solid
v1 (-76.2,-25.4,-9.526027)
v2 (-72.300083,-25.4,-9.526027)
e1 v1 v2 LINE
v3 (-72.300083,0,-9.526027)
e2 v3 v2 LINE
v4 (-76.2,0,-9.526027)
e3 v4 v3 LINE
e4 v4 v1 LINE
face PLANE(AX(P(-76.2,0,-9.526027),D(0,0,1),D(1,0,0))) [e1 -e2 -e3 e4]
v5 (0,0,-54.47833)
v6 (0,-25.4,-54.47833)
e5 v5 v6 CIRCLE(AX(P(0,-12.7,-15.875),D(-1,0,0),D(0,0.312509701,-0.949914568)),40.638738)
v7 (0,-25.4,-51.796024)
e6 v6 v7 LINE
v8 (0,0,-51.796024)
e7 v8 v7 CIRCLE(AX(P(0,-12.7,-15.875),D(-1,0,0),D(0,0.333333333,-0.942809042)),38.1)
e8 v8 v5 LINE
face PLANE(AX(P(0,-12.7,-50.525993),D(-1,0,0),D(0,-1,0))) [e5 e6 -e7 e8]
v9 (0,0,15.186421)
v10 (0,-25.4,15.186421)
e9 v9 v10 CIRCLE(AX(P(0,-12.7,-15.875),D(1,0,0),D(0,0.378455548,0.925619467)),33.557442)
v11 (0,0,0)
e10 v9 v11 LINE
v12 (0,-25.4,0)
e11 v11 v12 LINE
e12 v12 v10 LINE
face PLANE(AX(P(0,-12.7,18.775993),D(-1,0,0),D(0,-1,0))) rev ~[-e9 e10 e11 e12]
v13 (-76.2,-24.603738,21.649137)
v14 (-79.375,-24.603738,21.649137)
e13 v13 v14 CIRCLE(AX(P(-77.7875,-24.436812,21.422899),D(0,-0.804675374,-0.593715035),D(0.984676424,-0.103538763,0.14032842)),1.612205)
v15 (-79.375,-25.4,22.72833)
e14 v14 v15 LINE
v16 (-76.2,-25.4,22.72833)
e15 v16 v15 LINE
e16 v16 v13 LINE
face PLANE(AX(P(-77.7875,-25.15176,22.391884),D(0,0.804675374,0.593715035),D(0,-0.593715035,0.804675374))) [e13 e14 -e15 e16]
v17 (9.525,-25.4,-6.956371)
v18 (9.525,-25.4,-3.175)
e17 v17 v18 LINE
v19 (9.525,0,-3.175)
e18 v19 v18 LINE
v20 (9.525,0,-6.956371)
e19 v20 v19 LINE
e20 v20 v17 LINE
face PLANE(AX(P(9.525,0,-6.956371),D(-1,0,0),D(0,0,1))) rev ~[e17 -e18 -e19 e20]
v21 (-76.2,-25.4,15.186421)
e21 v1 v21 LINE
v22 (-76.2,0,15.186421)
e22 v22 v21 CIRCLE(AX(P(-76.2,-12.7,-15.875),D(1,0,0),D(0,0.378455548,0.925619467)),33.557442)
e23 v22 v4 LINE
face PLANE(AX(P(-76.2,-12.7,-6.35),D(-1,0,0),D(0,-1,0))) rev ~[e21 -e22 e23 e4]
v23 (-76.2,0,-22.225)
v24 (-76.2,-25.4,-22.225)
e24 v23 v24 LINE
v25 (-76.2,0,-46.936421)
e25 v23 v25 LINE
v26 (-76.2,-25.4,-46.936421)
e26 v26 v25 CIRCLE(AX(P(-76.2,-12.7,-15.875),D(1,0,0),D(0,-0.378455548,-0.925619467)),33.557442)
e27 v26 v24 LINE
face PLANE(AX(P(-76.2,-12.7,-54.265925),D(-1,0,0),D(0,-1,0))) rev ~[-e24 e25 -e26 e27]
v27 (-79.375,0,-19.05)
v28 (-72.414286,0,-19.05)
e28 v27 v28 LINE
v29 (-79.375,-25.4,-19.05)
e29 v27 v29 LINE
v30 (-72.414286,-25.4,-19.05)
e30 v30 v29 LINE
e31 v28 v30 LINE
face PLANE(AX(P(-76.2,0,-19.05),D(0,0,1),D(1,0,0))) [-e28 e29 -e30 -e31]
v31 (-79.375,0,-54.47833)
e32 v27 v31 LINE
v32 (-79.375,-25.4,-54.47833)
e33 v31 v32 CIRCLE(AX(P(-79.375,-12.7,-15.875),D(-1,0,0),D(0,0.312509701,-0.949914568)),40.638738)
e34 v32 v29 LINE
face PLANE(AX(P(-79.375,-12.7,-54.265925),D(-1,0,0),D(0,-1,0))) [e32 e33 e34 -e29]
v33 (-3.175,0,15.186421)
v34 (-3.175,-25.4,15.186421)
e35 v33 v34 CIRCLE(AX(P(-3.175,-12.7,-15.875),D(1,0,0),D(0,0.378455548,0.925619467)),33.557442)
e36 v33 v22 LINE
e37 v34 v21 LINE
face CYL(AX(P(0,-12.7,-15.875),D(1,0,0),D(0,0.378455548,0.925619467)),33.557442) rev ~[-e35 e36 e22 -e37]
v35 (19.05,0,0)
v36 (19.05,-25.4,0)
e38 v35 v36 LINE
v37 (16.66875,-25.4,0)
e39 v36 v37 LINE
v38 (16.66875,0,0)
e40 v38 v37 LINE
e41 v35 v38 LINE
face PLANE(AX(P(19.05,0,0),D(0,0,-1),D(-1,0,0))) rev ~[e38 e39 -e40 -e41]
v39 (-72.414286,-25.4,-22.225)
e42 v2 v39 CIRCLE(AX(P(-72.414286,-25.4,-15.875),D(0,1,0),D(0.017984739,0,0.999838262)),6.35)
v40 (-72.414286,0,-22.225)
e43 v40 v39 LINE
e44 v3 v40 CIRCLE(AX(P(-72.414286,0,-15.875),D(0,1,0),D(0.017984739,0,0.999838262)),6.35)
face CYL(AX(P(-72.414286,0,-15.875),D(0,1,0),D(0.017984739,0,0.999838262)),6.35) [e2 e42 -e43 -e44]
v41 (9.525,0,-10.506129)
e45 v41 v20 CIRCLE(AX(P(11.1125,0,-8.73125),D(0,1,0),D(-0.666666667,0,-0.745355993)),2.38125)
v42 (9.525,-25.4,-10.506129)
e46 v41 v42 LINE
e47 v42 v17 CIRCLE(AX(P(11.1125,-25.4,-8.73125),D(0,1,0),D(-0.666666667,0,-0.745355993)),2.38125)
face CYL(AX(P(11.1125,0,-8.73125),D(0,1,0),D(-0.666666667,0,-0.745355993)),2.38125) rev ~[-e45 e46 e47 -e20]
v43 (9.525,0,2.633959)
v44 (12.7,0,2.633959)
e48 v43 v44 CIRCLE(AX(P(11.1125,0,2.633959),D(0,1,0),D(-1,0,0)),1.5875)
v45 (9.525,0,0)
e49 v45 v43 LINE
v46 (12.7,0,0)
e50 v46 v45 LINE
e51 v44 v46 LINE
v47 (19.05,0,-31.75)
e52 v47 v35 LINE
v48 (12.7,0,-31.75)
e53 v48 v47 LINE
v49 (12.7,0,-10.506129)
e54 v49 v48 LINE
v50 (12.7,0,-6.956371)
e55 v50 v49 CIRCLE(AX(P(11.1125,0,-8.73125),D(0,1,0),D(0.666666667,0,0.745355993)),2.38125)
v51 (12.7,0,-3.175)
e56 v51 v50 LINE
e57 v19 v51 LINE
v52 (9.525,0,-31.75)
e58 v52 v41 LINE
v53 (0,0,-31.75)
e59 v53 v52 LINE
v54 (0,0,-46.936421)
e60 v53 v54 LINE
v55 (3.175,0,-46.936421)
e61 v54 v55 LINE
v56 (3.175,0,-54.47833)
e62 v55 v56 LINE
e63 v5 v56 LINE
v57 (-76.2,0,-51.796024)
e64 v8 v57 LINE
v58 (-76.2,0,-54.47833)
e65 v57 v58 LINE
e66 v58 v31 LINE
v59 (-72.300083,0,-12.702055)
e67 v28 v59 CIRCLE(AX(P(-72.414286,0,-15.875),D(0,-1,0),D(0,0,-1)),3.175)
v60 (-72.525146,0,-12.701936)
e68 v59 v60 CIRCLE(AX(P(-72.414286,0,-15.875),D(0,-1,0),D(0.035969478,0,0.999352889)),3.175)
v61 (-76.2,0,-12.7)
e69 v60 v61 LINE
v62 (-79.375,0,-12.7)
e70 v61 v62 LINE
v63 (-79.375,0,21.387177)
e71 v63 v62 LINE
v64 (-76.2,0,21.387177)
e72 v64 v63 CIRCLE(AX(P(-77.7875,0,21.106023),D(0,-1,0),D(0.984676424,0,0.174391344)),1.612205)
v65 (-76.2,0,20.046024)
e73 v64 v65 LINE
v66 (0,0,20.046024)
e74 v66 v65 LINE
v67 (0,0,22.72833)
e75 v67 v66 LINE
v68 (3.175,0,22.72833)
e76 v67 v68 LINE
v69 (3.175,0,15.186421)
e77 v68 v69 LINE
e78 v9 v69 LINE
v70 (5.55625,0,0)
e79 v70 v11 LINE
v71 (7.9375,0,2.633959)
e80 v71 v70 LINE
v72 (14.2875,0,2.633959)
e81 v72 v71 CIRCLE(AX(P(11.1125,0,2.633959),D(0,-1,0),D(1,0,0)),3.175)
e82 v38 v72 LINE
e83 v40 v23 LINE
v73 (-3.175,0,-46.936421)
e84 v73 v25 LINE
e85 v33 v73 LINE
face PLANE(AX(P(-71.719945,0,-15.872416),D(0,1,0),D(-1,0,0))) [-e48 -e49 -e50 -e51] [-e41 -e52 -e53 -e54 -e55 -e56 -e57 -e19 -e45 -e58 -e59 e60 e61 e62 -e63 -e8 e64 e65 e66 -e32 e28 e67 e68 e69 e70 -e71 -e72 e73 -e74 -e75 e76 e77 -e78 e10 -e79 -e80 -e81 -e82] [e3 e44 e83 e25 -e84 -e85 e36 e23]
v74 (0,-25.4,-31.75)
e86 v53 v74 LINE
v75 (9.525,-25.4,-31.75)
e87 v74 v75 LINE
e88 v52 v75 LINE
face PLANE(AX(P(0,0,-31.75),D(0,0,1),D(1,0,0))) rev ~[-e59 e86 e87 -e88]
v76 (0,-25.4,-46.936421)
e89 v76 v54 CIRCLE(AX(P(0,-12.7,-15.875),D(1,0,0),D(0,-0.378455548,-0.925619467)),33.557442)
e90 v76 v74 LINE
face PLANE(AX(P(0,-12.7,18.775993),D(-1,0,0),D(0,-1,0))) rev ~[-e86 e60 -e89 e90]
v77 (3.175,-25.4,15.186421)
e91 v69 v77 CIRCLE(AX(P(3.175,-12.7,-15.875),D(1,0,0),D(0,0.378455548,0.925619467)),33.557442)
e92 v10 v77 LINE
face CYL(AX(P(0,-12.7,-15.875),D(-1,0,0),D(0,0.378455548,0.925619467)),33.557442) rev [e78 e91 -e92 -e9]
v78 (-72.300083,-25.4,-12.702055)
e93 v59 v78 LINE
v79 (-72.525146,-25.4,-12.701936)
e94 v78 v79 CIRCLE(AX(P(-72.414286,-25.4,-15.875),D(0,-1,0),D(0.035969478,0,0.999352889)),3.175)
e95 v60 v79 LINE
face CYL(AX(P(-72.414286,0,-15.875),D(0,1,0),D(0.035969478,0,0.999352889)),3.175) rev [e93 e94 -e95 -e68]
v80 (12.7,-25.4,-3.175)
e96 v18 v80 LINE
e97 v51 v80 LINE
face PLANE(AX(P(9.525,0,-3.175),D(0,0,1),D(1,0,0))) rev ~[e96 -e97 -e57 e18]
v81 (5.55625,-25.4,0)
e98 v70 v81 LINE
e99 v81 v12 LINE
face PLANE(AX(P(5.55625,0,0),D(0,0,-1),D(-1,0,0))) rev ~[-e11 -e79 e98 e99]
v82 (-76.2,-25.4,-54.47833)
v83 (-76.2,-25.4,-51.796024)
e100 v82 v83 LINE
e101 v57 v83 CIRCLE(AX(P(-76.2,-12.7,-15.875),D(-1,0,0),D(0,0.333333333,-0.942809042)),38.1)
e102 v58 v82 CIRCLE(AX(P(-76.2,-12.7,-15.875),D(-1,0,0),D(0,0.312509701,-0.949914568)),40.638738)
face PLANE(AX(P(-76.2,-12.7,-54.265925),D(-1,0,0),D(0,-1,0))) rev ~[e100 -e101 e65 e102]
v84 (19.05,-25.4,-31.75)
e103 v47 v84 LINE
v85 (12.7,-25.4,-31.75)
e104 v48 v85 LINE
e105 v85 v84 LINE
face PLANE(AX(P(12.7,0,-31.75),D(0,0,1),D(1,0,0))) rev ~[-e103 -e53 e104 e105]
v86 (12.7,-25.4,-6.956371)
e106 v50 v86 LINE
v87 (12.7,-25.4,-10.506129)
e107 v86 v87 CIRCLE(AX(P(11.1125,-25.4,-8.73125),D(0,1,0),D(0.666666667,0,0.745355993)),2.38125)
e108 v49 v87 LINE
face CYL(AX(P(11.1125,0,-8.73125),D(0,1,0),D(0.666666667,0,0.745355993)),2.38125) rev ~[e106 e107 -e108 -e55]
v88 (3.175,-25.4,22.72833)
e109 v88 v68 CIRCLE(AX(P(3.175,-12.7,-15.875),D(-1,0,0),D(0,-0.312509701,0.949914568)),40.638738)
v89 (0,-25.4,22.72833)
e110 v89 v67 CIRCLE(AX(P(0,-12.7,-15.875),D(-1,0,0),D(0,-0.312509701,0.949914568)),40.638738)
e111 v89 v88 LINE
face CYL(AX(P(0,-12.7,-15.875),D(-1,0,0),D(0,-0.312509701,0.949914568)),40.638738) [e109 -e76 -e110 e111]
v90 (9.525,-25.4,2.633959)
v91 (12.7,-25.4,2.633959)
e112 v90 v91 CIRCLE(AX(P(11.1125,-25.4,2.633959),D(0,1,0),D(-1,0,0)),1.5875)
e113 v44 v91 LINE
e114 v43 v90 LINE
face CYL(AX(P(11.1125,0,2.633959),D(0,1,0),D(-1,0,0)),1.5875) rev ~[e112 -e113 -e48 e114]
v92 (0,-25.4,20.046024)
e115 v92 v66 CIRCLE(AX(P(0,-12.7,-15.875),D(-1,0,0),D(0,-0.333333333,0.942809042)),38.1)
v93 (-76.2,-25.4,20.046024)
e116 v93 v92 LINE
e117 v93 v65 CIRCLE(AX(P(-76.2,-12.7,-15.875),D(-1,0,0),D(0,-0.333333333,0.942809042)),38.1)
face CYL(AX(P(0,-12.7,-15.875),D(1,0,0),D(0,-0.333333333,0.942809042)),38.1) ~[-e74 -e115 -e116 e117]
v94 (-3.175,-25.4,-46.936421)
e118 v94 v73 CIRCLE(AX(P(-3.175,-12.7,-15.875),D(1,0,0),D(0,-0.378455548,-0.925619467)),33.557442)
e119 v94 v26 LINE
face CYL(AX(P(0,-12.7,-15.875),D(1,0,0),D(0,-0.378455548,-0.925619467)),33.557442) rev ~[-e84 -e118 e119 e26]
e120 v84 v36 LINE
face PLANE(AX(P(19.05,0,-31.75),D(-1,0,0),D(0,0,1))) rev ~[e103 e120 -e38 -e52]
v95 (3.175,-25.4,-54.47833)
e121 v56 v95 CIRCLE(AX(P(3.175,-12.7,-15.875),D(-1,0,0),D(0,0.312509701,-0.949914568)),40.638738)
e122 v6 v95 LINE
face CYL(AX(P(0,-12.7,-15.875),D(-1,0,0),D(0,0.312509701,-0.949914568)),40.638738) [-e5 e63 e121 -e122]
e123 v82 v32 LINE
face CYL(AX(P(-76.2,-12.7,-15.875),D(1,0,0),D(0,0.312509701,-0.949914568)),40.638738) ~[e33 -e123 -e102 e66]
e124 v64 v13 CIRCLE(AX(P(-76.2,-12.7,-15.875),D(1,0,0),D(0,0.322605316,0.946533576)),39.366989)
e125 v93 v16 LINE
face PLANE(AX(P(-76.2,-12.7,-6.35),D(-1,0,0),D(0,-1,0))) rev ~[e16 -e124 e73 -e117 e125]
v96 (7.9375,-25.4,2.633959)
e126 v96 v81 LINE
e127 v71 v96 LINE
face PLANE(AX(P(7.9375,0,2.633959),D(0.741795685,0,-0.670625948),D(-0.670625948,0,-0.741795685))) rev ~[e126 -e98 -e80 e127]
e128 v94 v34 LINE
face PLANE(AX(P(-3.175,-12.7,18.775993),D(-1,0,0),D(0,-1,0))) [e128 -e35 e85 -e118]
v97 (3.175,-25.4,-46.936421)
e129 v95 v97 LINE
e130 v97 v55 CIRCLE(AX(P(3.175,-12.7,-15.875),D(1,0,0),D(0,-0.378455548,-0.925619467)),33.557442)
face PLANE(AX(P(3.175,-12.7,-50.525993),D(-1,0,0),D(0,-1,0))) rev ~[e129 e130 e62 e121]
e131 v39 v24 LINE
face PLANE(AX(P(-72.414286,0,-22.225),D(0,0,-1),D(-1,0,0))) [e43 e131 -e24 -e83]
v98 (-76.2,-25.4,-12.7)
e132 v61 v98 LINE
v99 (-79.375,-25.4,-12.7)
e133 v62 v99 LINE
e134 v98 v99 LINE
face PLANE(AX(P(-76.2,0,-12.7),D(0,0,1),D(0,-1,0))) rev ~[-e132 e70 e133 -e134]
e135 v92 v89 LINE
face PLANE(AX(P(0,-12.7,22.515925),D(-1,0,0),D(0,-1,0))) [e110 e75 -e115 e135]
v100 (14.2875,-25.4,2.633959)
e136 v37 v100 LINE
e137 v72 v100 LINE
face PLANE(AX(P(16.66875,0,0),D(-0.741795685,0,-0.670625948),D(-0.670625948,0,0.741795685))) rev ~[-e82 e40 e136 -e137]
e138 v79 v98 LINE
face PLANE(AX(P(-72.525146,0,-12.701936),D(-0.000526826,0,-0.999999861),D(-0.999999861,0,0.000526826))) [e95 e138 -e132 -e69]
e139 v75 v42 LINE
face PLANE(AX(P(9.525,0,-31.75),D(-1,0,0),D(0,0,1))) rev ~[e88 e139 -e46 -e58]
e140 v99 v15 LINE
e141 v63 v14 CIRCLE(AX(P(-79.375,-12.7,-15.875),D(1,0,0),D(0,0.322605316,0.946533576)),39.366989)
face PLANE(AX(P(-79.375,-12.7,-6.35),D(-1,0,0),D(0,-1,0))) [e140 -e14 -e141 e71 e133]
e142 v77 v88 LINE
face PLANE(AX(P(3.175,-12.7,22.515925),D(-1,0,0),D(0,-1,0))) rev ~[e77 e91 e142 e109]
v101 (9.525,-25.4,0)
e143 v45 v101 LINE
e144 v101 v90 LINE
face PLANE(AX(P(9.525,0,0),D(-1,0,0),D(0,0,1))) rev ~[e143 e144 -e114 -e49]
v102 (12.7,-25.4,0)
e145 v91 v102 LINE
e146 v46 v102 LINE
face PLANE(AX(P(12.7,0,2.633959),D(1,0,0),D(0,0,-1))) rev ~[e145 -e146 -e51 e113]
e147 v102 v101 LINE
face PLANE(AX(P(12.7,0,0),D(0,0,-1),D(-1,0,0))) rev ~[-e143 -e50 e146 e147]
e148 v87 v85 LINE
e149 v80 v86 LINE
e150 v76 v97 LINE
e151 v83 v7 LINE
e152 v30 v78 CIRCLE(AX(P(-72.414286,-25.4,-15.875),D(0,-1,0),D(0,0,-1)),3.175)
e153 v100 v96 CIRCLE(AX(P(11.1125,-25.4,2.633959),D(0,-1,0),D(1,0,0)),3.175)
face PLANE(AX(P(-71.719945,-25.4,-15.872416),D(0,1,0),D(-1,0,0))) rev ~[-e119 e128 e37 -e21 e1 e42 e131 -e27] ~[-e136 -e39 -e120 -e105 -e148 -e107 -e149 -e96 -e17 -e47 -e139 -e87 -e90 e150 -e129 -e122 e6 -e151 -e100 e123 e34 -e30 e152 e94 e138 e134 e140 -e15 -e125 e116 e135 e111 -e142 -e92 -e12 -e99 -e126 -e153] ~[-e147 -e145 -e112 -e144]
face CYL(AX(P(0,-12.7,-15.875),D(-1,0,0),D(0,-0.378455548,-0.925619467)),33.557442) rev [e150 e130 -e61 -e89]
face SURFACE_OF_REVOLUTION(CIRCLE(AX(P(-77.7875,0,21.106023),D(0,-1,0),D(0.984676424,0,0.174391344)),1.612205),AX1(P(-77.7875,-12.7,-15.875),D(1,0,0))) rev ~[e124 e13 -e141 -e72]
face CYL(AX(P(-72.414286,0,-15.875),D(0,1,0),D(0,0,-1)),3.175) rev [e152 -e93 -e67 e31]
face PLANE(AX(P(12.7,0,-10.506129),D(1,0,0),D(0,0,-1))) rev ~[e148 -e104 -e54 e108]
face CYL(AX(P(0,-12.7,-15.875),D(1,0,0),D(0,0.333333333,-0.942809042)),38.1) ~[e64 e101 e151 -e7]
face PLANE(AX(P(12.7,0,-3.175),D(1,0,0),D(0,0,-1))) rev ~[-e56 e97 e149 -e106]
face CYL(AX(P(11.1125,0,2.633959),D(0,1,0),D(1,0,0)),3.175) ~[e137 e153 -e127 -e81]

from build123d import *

# Parameters (mm, degrees)
F1_DEPTH = 25.4
F2_W     = 25.4
F2_H     = 12.7
F3_DEPTH = 3.175
F4_DEPTH = 76.2
F5_START = 76.2
F5_DEPTH = 3.175
F6_DEPTH = 3.175
F8_DEPTH = 25.4


# Not quite as in the source:
# - a feature names something its author has since deleted; it is built from what else it names


with BuildPart() as f1:
    # F0 (on Front) → F1 (new body)
    with BuildSketch(Plane.XZ):
        with BuildLine():
            Line((5.55625, 0), (0, 0))
            Line((0, 0), (0, -31.75))
            Line((0, -31.75), (9.525, -31.75))
            Line((9.525, -31.75), (9.525, -10.5061289571))
            ThreePointArc((9.525, -10.5061289571), (8.73125, -8.73125), (9.525, -6.9563710429))
            Line((9.525, -6.9563710429), (9.525, -3.175))
            Line((9.525, -3.175), (11.1125, -3.175))
            Line((11.1125, -3.175), (12.7, -3.175))
            Line((12.7, -3.175), (12.7, -6.35))
            Line((12.7, -6.35), (12.7, -6.9563710429))
            ThreePointArc((12.7, -6.9563710429), (13.49375, -8.73125), (12.7, -10.5061289571))
            Line((12.7, -10.5061289571), (12.7, -28.575))
            Line((12.7, -28.575), (12.7, -31.75))
            Line((12.7, -31.75), (19.05, -31.75))
            Line((19.05, -31.75), (19.05, 0))
            Line((19.05, 0), (16.66875, 0))
            Line((16.66875, 0), (14.2875, 2.6339585893))
            ThreePointArc((14.2875, 2.6339585893), (11.1125, 5.8089585893), (7.9375, 2.6339585893))
            Line((7.9375, 2.6339585893), (5.55625, 0))
        make_face()
        with BuildLine():
            Line((12.7, 0), (11.1125, 0))
            Line((11.1125, 0), (9.525, 0))
            Line((9.525, 0), (9.525, 2.6339585893))
            ThreePointArc((9.525, 2.6339585893), (11.1125, 4.2214585893), (12.7, 2.6339585893))
            Line((12.7, 2.6339585893), (12.7, 0))
        make_face(mode=Mode.SUBTRACT)
    extrude(amount=F1_DEPTH)

    # F2 (on face) → F3 (join)
    with BuildSketch(Plane(origin=(0, 0, 0), x_dir=(0, -1, 0), z_dir=(-1, 0, 0))):
        with BuildLine():
            ThreePointArc((0, 15.186421298), (12.7, 17.6824416941), (25.4, 15.186421298))
            Line((25.4, 15.186421298), (25.4, 20.0460244843))
            ThreePointArc((25.4, 20.0460244843), (12.7, 22.225), (0, 20.0460244843))
            Line((0, 20.0460244843), (0, 15.186421298))
        make_face()
        with BuildLine():
            Line((0, 0), (25.4, 0))
            Line((25.4, 0), (25.4, 15.186421298))
            ThreePointArc((25.4, 15.186421298), (12.7, 17.6824416941), (0, 15.186421298))
            Line((0, 15.186421298), (0, 0))
        make_face()
        with BuildLine():
            Line((0, -31.75), (0, -46.936421298))
            ThreePointArc((0, -46.936421298), (12.7, -49.4324416941), (25.4, -46.936421298))
            Line((25.4, -46.936421298), (25.4, -31.75))
            Line((25.4, -31.75), (0, -31.75))
        make_face()
        with BuildLine():
            Line((0, -46.936421298), (0, -51.7960244843))
            ThreePointArc((0, -51.7960244843), (12.7, -53.975), (25.4, -51.7960244843))
            Line((25.4, -51.7960244843), (25.4, -46.936421298))
            ThreePointArc((25.4, -46.936421298), (12.7, -49.4324416941), (0, -46.936421298))
        make_face()
        with Locations((12.7, -25.4)):
            Rectangle(F2_W, F2_H)
        with Locations((12.7, -6.35)):
            Rectangle(F2_W, F2_H)
        Polygon((0, -15.875), (0, -19.05), (25.4, -19.05), (25.4, -12.7), (0, -12.7), align=None)
    extrude(amount=F3_DEPTH)

    # F2 (on face) → F4 (join)
    with BuildSketch(Plane(origin=(0, 0, 0), x_dir=(0, -1, 0), z_dir=(-1, 0, 0))):
        with BuildLine():
            ThreePointArc((0, 15.186421298), (12.7, 17.6824416941), (25.4, 15.186421298))
            Line((25.4, 15.186421298), (25.4, 20.0460244843))
            ThreePointArc((25.4, 20.0460244843), (12.7, 22.225), (0, 20.0460244843))
            Line((0, 20.0460244843), (0, 15.186421298))
        make_face()
        with BuildLine():
            Line((0, -46.936421298), (0, -51.7960244843))
            ThreePointArc((0, -51.7960244843), (12.7, -53.975), (25.4, -51.7960244843))
            Line((25.4, -51.7960244843), (25.4, -46.936421298))
            ThreePointArc((25.4, -46.936421298), (12.7, -49.4324416941), (0, -46.936421298))
        make_face()
    extrude(amount=F4_DEPTH)

    # F2 (on face) → F5 (join)
    with BuildSketch(Plane(origin=(0, 0, 0), x_dir=(0, -1, 0), z_dir=(-1, 0, 0)).offset(F5_START)):
        with BuildLine():
            ThreePointArc((25.4, -51.7960244843), (12.7, -53.975), (0, -51.7960244843))
            Line((0, -51.7960244843), (0, -54.4783297054))
            ThreePointArc((0, -54.4783297054), (12.7, -56.5137384689), (25.4, -54.4783297054))
            Line((25.4, -54.4783297054), (25.4, -51.7960244843))
        make_face()
        with BuildLine():
            Line((0, -46.936421298), (0, -51.7960244843))
            ThreePointArc((0, -51.7960244843), (12.7, -53.975), (25.4, -51.7960244843))
            Line((25.4, -51.7960244843), (25.4, -46.936421298))
            ThreePointArc((25.4, -46.936421298), (12.7, -49.4324416941), (0, -46.936421298))
        make_face()
        with BuildLine():
            Line((0, -31.75), (0, -46.936421298))
            ThreePointArc((0, -46.936421298), (12.7, -49.4324416941), (25.4, -46.936421298))
            Line((25.4, -46.936421298), (25.4, -31.75))
            Line((25.4, -31.75), (0, -31.75))
        make_face()
        with Locations((12.7, -25.4)):
            Rectangle(F2_W, F2_H)
        with Locations((12.7, -6.35)):
            Rectangle(F2_W, F2_H)
        with BuildLine():
            Line((0, 0), (25.4, 0))
            Line((25.4, 0), (25.4, 15.186421298))
            ThreePointArc((25.4, 15.186421298), (12.7, 17.6824416941), (0, 15.186421298))
            Line((0, 15.186421298), (0, 0))
        make_face()
        with BuildLine():
            ThreePointArc((0, 15.186421298), (12.7, 17.6824416941), (25.4, 15.186421298))
            Line((25.4, 15.186421298), (25.4, 20.0460244843))
            ThreePointArc((25.4, 20.0460244843), (12.7, 22.225), (0, 20.0460244843))
            Line((0, 20.0460244843), (0, 15.186421298))
        make_face()
        with BuildLine():
            ThreePointArc((0, 20.0460244843), (12.7, 22.225), (25.4, 20.0460244843))
            Line((25.4, 20.0460244843), (25.4, 22.7283297054))
            ThreePointArc((25.4, 22.7283297054), (12.7, 24.7637384689), (0, 22.7283297054))
            Line((0, 22.7283297054), (0, 20.0460244843))
        make_face()
    extrude(amount=F5_DEPTH)

    # F2 (on face) → F6 (join)
    with BuildSketch(Plane(origin=(0, 0, 0), x_dir=(0, -1, 0), z_dir=(-1, 0, 0))):
        with BuildLine():
            ThreePointArc((0, 20.0460244843), (12.7, 22.225), (25.4, 20.0460244843))
            Line((25.4, 20.0460244843), (25.4, 22.7283297054))
            ThreePointArc((25.4, 22.7283297054), (12.7, 24.7637384689), (0, 22.7283297054))
            Line((0, 22.7283297054), (0, 20.0460244843))
        make_face()
        with BuildLine():
            ThreePointArc((0, 15.186421298), (12.7, 17.6824416941), (25.4, 15.186421298))
            Line((25.4, 15.186421298), (25.4, 20.0460244843))
            ThreePointArc((25.4, 20.0460244843), (12.7, 22.225), (0, 20.0460244843))
            Line((0, 20.0460244843), (0, 15.186421298))
        make_face()
        with BuildLine():
            Line((0, -46.936421298), (0, -51.7960244843))
            ThreePointArc((0, -51.7960244843), (12.7, -53.975), (25.4, -51.7960244843))
            Line((25.4, -51.7960244843), (25.4, -46.936421298))
            ThreePointArc((25.4, -46.936421298), (12.7, -49.4324416941), (0, -46.936421298))
        make_face()
        with BuildLine():
            ThreePointArc((25.4, -51.7960244843), (12.7, -53.975), (0, -51.7960244843))
            Line((0, -51.7960244843), (0, -54.4783297054))
            ThreePointArc((0, -54.4783297054), (12.7, -56.5137384689), (25.4, -54.4783297054))
            Line((25.4, -54.4783297054), (25.4, -51.7960244843))
        make_face()
    extrude(amount=-F6_DEPTH)

    # F7 (on face) → F8 (join)
    with BuildSketch(Plane(origin=(0, 0, 0), x_dir=(-1, 0, 0), z_dir=(0, 1, 0))):
        with BuildLine():
            ThreePointArc((72.300083342, -12.7020545776), (72.4126137623, -12.7000004406), (72.5251462844, -12.7019360086))
            Line((72.5251462844, -12.7019360086), (76.2, -12.7))
            Line((76.2, -12.7), (76.2, -9.5260270395))
            Line((76.2, -9.5260270395), (72.5284895273, -9.5260270395))
            Line((72.5284895273, -9.5260270395), (72.300083342, -9.5260270395))
            ThreePointArc((72.300083342, -9.5260270395), (66.0645431997, -15.9321038554), (72.4142864347, -22.225))
            Line((72.4142864347, -22.225), (76.2, -22.225))
            Line((76.2, -22.225), (76.2, -19.05))
            Line((76.2, -19.05), (72.4142864347, -19.05))
            ThreePointArc((72.4142864347, -19.05), (69.2398001206, -15.9321107863), (72.300083342, -12.7020545776))
        make_face()
    extrude(amount=-F8_DEPTH)

    # F9: sweep along a path in F9_path
    with BuildLine(Plane(origin=(-79.375, 0, 22.7283297054), x_dir=(0, 0, -1), z_dir=(-1, 0, 0))) as f9_path:
        ThreePointArc((0, 0), (-2.0354087635, 12.7), (0, 25.4))
    # F7 (on face) → F9 (sweep, cut)
    with BuildSketch(Plane(origin=(0, 0, 0), x_dir=(-1, 0, 0), z_dir=(0, 1, 0))):
        with BuildLine():
            ThreePointArc((76.2, 21.3871770949), (77.7875, 22.7182272858), (79.375, 21.3871770949))
            Line((79.375, 21.3871770949), (79.375, 22.7283297054))
            Line((79.375, 22.7283297054), (77.7875, 22.7283297054))
            Line((77.7875, 22.7283297054), (76.2, 22.7283297054))
            Line((76.2, 22.7283297054), (76.2, 21.3871770949))
        make_face()
    sweep(path=f9_path.line, mode=Mode.SUBTRACT)


solid = f1.part
